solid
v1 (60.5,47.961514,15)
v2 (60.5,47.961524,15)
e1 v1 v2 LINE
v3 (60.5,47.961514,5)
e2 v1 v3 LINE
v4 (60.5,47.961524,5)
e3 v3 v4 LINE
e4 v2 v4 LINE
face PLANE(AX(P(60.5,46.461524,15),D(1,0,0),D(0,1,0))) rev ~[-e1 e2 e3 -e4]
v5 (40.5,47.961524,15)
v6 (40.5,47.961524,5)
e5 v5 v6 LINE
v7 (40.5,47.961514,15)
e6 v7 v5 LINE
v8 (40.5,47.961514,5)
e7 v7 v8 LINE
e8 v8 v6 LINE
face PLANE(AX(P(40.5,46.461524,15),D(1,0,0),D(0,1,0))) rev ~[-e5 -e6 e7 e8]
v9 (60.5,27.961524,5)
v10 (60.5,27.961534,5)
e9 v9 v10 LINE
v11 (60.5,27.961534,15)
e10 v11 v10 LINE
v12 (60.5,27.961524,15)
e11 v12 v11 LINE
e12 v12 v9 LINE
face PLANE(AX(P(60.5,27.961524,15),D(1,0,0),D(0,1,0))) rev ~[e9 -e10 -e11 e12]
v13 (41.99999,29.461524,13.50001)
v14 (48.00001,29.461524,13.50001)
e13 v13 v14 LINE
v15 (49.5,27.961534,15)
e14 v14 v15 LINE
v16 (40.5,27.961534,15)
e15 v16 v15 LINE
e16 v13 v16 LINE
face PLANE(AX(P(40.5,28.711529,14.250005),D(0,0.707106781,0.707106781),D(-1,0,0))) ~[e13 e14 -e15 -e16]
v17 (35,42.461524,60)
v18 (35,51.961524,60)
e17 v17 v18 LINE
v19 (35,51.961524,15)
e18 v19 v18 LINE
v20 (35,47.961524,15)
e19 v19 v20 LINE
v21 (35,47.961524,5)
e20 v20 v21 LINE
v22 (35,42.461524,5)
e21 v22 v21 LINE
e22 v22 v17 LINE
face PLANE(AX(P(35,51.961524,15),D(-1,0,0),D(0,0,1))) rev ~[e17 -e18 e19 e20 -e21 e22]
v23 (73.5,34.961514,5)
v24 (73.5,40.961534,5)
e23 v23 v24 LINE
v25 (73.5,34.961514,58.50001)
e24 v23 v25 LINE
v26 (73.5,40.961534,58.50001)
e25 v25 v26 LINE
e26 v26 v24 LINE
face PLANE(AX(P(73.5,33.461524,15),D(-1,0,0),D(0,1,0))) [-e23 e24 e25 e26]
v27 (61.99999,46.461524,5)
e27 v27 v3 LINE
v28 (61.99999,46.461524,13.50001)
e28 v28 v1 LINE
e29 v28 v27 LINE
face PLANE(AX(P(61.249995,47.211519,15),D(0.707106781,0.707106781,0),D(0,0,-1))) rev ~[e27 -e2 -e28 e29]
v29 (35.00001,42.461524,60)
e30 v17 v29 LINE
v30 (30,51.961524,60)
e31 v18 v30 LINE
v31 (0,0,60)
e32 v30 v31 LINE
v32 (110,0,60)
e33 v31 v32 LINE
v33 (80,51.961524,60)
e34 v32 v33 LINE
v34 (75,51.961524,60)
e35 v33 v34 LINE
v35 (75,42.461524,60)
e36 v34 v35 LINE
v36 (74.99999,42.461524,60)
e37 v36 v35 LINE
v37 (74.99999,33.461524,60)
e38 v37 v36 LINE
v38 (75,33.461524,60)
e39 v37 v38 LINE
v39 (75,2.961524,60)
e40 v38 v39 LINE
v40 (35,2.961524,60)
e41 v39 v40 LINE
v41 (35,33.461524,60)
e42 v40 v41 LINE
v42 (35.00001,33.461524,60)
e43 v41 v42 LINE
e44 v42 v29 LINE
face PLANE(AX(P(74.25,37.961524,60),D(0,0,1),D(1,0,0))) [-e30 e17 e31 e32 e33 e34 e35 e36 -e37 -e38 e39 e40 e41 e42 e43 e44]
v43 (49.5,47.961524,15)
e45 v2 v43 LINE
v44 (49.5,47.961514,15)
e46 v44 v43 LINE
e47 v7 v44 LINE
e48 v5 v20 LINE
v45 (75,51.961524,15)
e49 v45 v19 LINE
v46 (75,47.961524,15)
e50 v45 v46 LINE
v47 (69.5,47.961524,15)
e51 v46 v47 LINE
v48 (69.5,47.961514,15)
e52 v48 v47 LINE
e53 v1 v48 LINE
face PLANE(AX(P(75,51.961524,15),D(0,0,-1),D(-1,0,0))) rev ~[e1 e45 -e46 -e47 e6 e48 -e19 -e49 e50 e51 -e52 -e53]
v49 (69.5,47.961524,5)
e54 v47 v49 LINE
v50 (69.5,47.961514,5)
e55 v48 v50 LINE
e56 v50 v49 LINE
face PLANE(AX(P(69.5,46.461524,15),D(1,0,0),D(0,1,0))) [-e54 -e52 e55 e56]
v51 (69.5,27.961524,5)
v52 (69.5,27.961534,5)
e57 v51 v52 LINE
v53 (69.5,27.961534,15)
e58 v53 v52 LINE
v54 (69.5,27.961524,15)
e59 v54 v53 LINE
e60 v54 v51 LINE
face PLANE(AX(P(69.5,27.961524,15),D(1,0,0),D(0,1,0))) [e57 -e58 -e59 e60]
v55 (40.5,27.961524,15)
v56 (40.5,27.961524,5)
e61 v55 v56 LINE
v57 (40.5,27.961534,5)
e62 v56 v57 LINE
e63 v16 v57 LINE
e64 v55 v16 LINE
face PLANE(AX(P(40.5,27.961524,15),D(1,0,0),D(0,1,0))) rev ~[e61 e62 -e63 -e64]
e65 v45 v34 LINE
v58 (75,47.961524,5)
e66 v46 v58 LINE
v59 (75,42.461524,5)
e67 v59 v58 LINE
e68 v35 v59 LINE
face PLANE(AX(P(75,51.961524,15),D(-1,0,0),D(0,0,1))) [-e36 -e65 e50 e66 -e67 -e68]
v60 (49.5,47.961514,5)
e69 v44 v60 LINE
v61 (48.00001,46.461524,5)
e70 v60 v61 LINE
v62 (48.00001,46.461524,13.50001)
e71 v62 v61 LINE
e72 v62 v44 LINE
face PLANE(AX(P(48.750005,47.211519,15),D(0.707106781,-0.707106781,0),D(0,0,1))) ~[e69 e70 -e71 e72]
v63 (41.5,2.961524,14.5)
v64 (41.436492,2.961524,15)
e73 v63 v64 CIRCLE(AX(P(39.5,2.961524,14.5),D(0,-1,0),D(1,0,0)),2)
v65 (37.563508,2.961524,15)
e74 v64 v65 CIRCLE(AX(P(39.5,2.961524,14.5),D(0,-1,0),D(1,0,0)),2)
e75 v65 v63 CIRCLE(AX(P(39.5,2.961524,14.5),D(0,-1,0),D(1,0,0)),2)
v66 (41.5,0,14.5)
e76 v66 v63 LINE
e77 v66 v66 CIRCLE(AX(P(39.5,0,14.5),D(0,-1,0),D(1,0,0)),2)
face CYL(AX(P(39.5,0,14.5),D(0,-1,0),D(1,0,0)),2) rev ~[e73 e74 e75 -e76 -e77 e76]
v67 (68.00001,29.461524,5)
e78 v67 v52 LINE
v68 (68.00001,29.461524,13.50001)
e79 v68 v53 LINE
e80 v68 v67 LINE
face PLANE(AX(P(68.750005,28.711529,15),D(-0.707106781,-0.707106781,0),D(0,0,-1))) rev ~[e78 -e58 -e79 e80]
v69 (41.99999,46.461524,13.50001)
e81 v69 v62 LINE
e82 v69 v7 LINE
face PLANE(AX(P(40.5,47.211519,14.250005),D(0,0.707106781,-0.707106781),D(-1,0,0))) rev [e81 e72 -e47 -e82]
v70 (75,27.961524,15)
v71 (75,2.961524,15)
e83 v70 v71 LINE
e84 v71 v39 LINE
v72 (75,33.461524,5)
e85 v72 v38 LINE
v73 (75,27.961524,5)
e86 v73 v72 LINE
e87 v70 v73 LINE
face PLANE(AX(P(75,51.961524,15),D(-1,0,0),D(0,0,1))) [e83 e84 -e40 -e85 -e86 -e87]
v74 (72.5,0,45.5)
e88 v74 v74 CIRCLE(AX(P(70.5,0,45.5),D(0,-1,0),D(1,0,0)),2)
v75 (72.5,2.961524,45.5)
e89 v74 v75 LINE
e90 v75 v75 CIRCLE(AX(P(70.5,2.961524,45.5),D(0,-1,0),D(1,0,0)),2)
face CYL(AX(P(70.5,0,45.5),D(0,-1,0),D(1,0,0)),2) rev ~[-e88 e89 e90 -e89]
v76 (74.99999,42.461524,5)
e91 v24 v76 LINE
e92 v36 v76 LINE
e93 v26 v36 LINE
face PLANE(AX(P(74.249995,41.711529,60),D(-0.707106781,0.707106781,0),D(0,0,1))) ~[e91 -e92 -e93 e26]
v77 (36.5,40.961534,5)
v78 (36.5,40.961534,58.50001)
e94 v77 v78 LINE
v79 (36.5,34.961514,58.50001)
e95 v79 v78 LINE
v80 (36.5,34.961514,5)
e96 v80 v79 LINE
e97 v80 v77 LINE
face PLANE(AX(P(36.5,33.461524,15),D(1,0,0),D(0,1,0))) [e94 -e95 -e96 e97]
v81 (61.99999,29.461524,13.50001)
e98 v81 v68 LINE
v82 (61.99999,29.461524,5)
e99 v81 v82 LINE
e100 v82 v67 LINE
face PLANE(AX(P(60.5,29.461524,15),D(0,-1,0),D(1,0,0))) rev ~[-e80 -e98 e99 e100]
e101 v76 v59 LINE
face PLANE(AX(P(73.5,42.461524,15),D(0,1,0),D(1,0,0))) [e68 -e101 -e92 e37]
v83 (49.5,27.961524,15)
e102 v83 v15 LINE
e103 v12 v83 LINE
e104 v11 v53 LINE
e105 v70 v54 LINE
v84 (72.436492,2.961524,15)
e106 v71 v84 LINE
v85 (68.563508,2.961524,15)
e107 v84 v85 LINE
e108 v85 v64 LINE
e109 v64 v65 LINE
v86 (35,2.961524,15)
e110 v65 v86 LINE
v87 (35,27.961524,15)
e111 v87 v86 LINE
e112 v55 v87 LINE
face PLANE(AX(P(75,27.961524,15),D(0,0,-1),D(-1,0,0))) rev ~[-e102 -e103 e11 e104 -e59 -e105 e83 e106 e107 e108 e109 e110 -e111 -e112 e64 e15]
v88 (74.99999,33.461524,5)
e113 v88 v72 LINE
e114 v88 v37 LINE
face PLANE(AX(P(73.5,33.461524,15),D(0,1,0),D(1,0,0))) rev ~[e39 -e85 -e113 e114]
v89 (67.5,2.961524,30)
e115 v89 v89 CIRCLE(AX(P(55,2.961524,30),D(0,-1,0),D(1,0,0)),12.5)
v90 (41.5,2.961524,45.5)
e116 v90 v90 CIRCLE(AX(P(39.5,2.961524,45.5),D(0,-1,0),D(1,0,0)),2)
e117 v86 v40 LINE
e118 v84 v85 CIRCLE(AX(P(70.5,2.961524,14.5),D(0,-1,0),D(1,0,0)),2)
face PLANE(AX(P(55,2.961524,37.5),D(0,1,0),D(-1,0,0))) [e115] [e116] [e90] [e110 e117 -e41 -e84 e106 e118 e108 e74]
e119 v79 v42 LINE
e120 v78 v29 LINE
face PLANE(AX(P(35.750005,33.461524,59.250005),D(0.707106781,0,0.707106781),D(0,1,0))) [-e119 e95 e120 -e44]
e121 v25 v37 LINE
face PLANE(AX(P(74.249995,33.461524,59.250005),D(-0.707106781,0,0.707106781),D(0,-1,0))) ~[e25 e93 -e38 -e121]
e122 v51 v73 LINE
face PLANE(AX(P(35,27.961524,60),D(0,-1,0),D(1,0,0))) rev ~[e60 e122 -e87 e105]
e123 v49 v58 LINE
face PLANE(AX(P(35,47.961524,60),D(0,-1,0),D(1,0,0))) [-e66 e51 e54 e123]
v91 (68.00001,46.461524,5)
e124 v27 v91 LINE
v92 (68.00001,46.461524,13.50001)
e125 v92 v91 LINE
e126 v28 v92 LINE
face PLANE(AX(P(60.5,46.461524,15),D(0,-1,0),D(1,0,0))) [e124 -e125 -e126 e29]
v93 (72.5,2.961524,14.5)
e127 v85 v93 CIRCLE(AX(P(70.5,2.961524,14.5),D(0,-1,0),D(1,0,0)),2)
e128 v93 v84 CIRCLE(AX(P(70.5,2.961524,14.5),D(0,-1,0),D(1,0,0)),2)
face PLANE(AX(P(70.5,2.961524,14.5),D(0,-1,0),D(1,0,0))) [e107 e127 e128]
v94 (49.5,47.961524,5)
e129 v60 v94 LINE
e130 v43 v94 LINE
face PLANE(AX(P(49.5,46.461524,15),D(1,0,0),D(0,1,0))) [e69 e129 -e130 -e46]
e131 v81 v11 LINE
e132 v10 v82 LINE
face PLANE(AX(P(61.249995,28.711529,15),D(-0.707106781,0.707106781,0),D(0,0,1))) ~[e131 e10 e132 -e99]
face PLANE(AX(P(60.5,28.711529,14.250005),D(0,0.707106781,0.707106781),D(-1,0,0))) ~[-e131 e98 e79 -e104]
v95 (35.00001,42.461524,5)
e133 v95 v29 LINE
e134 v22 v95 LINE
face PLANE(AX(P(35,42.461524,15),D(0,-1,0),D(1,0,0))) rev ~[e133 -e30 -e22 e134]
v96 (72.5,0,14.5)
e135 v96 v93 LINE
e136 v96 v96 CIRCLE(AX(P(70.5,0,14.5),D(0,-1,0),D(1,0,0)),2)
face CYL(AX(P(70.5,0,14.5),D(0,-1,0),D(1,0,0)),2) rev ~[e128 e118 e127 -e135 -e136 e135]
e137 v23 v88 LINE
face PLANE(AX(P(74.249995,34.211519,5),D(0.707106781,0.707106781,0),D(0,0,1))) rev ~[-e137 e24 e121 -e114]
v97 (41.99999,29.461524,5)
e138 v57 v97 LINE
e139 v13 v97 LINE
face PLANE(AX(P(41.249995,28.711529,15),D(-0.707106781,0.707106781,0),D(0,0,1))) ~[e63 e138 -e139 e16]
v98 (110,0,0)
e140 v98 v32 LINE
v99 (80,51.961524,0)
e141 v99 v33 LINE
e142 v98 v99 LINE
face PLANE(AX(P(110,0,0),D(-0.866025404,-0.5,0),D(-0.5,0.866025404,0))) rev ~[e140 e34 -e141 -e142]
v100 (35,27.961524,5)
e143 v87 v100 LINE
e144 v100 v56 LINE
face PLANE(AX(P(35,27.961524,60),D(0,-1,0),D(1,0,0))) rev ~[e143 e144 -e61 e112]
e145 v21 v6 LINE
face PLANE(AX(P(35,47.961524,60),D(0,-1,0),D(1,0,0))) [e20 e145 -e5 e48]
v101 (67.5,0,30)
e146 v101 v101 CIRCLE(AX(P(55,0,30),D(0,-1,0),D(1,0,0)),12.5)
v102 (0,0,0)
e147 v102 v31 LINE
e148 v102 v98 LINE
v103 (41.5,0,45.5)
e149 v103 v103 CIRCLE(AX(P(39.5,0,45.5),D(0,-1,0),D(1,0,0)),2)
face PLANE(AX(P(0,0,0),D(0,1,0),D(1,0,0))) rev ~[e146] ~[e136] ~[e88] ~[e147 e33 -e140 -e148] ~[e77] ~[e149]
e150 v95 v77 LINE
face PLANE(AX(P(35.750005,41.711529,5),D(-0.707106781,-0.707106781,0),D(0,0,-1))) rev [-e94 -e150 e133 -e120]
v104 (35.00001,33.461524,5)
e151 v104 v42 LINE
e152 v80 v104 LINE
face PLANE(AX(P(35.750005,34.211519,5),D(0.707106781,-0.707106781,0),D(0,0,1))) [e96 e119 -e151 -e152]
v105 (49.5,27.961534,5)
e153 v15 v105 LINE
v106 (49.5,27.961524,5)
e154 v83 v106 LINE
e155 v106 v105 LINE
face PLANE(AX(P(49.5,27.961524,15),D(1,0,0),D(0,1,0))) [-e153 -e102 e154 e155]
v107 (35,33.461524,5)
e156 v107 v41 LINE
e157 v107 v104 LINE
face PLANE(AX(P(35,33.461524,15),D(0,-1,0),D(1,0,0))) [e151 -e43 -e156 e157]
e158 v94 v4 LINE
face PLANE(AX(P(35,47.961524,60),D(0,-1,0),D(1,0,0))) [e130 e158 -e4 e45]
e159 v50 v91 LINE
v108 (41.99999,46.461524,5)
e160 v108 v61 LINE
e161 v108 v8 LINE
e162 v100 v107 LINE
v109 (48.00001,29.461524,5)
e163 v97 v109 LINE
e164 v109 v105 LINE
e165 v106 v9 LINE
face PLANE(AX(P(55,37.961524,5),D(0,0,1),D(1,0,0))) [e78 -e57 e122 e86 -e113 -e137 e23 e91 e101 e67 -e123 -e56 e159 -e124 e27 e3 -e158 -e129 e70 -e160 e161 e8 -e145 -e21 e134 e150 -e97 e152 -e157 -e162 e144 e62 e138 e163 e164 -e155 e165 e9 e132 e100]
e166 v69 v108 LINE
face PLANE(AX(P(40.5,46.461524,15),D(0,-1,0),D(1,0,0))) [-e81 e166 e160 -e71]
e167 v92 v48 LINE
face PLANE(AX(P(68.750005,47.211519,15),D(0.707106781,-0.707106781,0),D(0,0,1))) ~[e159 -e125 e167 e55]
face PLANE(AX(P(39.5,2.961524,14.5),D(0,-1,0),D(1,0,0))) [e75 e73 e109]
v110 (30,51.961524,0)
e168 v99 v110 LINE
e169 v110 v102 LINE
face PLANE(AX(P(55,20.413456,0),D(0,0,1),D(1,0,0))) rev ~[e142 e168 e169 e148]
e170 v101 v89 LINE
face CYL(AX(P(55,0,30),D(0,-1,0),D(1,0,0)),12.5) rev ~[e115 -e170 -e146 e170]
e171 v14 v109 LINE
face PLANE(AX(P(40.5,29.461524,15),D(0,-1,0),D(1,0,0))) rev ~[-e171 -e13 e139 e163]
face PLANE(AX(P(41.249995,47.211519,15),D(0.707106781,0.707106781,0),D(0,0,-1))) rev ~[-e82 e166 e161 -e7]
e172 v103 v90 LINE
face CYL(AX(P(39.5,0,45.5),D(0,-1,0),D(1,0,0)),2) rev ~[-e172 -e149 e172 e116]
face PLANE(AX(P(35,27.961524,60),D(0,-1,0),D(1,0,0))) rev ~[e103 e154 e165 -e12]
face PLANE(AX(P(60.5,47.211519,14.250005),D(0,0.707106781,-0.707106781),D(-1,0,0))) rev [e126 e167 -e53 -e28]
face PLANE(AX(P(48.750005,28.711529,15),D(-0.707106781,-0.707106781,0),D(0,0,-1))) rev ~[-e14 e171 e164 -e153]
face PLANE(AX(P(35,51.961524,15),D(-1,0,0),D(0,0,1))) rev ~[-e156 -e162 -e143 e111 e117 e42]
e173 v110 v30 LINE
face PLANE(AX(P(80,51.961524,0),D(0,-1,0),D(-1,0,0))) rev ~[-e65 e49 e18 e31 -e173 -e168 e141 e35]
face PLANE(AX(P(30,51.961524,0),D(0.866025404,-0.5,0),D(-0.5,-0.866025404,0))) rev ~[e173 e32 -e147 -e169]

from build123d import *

# Parameters (mm, degrees)
F1_DEPTH  = 60
F2_W      = 40
F2_H      = 20
F3_DEPTH  = 55
F4_W      = 40
F4_H      = 45
F5_DEPTH  = 4
F6_W      = 40
F6_H      = 45
F7_DEPTH  = 25
F8_R      = 12.5
F8_R_2    = 2
F9_DEPTH  = 2.9615242271
F10_W     = 9
F10_H     = 1.5
F10_W_2   = 1.5
F10_H_2   = 9
F11_DEPTH = 10
F12_DEPTH = 45
F13_SIZE  = 1.49999


# Not quite as in the source:
# - a fillet or chamfer is up to 0.001 mm smaller than in the source, because OpenCascade refuses the exact size


with BuildPart() as f1:
    # F0 (on Top) → F1 (new body)
    with BuildSketch(Plane.XY):
        Polygon((30, 51.9615242271), (0, 0), (110, 0), (80, 51.9615242271), align=None)
    extrude(amount=F1_DEPTH)

    # F2 (on face) → F3 (cut)
    with BuildSketch(Plane.XY.offset(60)):
        with Locations((55, 37.9615242271)):
            Rectangle(F2_W, F2_H)
    extrude(amount=-F3_DEPTH, mode=Mode.SUBTRACT)

    # F4 (on face) → F5 (cut, through all)
    with BuildSketch(Plane(origin=(0, 51.9615242271, 0), x_dir=(-1, 0, 0), z_dir=(0, 1, 0))):
        with Locations((-55, 37.5)):
            Rectangle(F4_W, F4_H)
    extrude(amount=-F5_DEPTH, mode=Mode.SUBTRACT)

    # F6 (on face) → F7 (cut)
    with BuildSketch(Plane(origin=(0, 27.9615242271, 0), x_dir=(-1, 0, 0), z_dir=(0, 1, 0))):
        with Locations((-55, 37.5)):
            Rectangle(F6_W, F6_H)
    extrude(amount=-F7_DEPTH, mode=Mode.SUBTRACT)

    # F8 (on face) → F9 (cut, through all)
    with BuildSketch(Plane.XZ):
        with Locations((55, 30)):
            Circle(F8_R)
        with Locations((70.5, 45.5)):
            Circle(F8_R_2)
        with Locations((39.5, 45.5)):
            Circle(F8_R_2)
        with Locations((39.5, 14.5)):
            Circle(F8_R_2)
        with Locations((70.5, 14.5)):
            Circle(F8_R_2)
    extrude(amount=-F9_DEPTH, mode=Mode.SUBTRACT)

    # F10 (on face) → F11 (join, through all)
    with BuildSketch(Plane.XY.offset(15)):
        with Locations((45, 47.2115242271)):
            Rectangle(F10_W, F10_H)
        with Locations((65, 47.2115242271)):
            Rectangle(F10_W, F10_H)
        with Locations((45, 28.7115242271)):
            Rectangle(F10_W, F10_H)
        with Locations((65, 28.7115242271)):
            Rectangle(F10_W, F10_H)
        with Locations((35.75, 37.9615242271)):
            Rectangle(F10_W_2, F10_H_2)
        with Locations((74.25, 37.9615242271)):
            Rectangle(F10_W_2, F10_H_2)
    extrude(amount=-F11_DEPTH)

    # F12 (add, through all): faces of the model
    f12_faces = [f1.faces().sort_by_distance(p)[0] for p in [
        (74.25, 37.9615242271, 15),
        (35.75, 37.9615242271, 15),
    ]]
    extrude(f12_faces, amount=F12_DEPTH)

    # F13 (size 1.5 in the source; OpenCascade refuses exactly that, so slightly less here)
    f13_edges = [f1.edges().sort_by_distance(p)[0] for p in [
        (36.5, 33.461524, 32.5),
        (73.5, 37.961524, 60),
        (73.5, 42.461524, 32.5),
        (36.5, 37.961524, 60),
        (36.5, 42.461524, 32.5),
        (73.5, 33.461524, 32.5),
        (65, 29.461524, 15),
        (69.5, 29.461524, 10),
        (60.5, 29.461524, 10),
        (49.5, 29.461524, 10),
        (45, 29.461524, 15),
        (40.5, 46.461524, 10),
        (45, 46.461524, 15),
        (60.5, 46.461524, 10),
        (65, 46.461524, 15),
        (49.5, 46.461524, 10),
        (40.5, 29.461524, 10),
        (69.5, 46.461524, 10),
    ]]
    chamfer(f13_edges, length=F13_SIZE)


solid = f1.part
